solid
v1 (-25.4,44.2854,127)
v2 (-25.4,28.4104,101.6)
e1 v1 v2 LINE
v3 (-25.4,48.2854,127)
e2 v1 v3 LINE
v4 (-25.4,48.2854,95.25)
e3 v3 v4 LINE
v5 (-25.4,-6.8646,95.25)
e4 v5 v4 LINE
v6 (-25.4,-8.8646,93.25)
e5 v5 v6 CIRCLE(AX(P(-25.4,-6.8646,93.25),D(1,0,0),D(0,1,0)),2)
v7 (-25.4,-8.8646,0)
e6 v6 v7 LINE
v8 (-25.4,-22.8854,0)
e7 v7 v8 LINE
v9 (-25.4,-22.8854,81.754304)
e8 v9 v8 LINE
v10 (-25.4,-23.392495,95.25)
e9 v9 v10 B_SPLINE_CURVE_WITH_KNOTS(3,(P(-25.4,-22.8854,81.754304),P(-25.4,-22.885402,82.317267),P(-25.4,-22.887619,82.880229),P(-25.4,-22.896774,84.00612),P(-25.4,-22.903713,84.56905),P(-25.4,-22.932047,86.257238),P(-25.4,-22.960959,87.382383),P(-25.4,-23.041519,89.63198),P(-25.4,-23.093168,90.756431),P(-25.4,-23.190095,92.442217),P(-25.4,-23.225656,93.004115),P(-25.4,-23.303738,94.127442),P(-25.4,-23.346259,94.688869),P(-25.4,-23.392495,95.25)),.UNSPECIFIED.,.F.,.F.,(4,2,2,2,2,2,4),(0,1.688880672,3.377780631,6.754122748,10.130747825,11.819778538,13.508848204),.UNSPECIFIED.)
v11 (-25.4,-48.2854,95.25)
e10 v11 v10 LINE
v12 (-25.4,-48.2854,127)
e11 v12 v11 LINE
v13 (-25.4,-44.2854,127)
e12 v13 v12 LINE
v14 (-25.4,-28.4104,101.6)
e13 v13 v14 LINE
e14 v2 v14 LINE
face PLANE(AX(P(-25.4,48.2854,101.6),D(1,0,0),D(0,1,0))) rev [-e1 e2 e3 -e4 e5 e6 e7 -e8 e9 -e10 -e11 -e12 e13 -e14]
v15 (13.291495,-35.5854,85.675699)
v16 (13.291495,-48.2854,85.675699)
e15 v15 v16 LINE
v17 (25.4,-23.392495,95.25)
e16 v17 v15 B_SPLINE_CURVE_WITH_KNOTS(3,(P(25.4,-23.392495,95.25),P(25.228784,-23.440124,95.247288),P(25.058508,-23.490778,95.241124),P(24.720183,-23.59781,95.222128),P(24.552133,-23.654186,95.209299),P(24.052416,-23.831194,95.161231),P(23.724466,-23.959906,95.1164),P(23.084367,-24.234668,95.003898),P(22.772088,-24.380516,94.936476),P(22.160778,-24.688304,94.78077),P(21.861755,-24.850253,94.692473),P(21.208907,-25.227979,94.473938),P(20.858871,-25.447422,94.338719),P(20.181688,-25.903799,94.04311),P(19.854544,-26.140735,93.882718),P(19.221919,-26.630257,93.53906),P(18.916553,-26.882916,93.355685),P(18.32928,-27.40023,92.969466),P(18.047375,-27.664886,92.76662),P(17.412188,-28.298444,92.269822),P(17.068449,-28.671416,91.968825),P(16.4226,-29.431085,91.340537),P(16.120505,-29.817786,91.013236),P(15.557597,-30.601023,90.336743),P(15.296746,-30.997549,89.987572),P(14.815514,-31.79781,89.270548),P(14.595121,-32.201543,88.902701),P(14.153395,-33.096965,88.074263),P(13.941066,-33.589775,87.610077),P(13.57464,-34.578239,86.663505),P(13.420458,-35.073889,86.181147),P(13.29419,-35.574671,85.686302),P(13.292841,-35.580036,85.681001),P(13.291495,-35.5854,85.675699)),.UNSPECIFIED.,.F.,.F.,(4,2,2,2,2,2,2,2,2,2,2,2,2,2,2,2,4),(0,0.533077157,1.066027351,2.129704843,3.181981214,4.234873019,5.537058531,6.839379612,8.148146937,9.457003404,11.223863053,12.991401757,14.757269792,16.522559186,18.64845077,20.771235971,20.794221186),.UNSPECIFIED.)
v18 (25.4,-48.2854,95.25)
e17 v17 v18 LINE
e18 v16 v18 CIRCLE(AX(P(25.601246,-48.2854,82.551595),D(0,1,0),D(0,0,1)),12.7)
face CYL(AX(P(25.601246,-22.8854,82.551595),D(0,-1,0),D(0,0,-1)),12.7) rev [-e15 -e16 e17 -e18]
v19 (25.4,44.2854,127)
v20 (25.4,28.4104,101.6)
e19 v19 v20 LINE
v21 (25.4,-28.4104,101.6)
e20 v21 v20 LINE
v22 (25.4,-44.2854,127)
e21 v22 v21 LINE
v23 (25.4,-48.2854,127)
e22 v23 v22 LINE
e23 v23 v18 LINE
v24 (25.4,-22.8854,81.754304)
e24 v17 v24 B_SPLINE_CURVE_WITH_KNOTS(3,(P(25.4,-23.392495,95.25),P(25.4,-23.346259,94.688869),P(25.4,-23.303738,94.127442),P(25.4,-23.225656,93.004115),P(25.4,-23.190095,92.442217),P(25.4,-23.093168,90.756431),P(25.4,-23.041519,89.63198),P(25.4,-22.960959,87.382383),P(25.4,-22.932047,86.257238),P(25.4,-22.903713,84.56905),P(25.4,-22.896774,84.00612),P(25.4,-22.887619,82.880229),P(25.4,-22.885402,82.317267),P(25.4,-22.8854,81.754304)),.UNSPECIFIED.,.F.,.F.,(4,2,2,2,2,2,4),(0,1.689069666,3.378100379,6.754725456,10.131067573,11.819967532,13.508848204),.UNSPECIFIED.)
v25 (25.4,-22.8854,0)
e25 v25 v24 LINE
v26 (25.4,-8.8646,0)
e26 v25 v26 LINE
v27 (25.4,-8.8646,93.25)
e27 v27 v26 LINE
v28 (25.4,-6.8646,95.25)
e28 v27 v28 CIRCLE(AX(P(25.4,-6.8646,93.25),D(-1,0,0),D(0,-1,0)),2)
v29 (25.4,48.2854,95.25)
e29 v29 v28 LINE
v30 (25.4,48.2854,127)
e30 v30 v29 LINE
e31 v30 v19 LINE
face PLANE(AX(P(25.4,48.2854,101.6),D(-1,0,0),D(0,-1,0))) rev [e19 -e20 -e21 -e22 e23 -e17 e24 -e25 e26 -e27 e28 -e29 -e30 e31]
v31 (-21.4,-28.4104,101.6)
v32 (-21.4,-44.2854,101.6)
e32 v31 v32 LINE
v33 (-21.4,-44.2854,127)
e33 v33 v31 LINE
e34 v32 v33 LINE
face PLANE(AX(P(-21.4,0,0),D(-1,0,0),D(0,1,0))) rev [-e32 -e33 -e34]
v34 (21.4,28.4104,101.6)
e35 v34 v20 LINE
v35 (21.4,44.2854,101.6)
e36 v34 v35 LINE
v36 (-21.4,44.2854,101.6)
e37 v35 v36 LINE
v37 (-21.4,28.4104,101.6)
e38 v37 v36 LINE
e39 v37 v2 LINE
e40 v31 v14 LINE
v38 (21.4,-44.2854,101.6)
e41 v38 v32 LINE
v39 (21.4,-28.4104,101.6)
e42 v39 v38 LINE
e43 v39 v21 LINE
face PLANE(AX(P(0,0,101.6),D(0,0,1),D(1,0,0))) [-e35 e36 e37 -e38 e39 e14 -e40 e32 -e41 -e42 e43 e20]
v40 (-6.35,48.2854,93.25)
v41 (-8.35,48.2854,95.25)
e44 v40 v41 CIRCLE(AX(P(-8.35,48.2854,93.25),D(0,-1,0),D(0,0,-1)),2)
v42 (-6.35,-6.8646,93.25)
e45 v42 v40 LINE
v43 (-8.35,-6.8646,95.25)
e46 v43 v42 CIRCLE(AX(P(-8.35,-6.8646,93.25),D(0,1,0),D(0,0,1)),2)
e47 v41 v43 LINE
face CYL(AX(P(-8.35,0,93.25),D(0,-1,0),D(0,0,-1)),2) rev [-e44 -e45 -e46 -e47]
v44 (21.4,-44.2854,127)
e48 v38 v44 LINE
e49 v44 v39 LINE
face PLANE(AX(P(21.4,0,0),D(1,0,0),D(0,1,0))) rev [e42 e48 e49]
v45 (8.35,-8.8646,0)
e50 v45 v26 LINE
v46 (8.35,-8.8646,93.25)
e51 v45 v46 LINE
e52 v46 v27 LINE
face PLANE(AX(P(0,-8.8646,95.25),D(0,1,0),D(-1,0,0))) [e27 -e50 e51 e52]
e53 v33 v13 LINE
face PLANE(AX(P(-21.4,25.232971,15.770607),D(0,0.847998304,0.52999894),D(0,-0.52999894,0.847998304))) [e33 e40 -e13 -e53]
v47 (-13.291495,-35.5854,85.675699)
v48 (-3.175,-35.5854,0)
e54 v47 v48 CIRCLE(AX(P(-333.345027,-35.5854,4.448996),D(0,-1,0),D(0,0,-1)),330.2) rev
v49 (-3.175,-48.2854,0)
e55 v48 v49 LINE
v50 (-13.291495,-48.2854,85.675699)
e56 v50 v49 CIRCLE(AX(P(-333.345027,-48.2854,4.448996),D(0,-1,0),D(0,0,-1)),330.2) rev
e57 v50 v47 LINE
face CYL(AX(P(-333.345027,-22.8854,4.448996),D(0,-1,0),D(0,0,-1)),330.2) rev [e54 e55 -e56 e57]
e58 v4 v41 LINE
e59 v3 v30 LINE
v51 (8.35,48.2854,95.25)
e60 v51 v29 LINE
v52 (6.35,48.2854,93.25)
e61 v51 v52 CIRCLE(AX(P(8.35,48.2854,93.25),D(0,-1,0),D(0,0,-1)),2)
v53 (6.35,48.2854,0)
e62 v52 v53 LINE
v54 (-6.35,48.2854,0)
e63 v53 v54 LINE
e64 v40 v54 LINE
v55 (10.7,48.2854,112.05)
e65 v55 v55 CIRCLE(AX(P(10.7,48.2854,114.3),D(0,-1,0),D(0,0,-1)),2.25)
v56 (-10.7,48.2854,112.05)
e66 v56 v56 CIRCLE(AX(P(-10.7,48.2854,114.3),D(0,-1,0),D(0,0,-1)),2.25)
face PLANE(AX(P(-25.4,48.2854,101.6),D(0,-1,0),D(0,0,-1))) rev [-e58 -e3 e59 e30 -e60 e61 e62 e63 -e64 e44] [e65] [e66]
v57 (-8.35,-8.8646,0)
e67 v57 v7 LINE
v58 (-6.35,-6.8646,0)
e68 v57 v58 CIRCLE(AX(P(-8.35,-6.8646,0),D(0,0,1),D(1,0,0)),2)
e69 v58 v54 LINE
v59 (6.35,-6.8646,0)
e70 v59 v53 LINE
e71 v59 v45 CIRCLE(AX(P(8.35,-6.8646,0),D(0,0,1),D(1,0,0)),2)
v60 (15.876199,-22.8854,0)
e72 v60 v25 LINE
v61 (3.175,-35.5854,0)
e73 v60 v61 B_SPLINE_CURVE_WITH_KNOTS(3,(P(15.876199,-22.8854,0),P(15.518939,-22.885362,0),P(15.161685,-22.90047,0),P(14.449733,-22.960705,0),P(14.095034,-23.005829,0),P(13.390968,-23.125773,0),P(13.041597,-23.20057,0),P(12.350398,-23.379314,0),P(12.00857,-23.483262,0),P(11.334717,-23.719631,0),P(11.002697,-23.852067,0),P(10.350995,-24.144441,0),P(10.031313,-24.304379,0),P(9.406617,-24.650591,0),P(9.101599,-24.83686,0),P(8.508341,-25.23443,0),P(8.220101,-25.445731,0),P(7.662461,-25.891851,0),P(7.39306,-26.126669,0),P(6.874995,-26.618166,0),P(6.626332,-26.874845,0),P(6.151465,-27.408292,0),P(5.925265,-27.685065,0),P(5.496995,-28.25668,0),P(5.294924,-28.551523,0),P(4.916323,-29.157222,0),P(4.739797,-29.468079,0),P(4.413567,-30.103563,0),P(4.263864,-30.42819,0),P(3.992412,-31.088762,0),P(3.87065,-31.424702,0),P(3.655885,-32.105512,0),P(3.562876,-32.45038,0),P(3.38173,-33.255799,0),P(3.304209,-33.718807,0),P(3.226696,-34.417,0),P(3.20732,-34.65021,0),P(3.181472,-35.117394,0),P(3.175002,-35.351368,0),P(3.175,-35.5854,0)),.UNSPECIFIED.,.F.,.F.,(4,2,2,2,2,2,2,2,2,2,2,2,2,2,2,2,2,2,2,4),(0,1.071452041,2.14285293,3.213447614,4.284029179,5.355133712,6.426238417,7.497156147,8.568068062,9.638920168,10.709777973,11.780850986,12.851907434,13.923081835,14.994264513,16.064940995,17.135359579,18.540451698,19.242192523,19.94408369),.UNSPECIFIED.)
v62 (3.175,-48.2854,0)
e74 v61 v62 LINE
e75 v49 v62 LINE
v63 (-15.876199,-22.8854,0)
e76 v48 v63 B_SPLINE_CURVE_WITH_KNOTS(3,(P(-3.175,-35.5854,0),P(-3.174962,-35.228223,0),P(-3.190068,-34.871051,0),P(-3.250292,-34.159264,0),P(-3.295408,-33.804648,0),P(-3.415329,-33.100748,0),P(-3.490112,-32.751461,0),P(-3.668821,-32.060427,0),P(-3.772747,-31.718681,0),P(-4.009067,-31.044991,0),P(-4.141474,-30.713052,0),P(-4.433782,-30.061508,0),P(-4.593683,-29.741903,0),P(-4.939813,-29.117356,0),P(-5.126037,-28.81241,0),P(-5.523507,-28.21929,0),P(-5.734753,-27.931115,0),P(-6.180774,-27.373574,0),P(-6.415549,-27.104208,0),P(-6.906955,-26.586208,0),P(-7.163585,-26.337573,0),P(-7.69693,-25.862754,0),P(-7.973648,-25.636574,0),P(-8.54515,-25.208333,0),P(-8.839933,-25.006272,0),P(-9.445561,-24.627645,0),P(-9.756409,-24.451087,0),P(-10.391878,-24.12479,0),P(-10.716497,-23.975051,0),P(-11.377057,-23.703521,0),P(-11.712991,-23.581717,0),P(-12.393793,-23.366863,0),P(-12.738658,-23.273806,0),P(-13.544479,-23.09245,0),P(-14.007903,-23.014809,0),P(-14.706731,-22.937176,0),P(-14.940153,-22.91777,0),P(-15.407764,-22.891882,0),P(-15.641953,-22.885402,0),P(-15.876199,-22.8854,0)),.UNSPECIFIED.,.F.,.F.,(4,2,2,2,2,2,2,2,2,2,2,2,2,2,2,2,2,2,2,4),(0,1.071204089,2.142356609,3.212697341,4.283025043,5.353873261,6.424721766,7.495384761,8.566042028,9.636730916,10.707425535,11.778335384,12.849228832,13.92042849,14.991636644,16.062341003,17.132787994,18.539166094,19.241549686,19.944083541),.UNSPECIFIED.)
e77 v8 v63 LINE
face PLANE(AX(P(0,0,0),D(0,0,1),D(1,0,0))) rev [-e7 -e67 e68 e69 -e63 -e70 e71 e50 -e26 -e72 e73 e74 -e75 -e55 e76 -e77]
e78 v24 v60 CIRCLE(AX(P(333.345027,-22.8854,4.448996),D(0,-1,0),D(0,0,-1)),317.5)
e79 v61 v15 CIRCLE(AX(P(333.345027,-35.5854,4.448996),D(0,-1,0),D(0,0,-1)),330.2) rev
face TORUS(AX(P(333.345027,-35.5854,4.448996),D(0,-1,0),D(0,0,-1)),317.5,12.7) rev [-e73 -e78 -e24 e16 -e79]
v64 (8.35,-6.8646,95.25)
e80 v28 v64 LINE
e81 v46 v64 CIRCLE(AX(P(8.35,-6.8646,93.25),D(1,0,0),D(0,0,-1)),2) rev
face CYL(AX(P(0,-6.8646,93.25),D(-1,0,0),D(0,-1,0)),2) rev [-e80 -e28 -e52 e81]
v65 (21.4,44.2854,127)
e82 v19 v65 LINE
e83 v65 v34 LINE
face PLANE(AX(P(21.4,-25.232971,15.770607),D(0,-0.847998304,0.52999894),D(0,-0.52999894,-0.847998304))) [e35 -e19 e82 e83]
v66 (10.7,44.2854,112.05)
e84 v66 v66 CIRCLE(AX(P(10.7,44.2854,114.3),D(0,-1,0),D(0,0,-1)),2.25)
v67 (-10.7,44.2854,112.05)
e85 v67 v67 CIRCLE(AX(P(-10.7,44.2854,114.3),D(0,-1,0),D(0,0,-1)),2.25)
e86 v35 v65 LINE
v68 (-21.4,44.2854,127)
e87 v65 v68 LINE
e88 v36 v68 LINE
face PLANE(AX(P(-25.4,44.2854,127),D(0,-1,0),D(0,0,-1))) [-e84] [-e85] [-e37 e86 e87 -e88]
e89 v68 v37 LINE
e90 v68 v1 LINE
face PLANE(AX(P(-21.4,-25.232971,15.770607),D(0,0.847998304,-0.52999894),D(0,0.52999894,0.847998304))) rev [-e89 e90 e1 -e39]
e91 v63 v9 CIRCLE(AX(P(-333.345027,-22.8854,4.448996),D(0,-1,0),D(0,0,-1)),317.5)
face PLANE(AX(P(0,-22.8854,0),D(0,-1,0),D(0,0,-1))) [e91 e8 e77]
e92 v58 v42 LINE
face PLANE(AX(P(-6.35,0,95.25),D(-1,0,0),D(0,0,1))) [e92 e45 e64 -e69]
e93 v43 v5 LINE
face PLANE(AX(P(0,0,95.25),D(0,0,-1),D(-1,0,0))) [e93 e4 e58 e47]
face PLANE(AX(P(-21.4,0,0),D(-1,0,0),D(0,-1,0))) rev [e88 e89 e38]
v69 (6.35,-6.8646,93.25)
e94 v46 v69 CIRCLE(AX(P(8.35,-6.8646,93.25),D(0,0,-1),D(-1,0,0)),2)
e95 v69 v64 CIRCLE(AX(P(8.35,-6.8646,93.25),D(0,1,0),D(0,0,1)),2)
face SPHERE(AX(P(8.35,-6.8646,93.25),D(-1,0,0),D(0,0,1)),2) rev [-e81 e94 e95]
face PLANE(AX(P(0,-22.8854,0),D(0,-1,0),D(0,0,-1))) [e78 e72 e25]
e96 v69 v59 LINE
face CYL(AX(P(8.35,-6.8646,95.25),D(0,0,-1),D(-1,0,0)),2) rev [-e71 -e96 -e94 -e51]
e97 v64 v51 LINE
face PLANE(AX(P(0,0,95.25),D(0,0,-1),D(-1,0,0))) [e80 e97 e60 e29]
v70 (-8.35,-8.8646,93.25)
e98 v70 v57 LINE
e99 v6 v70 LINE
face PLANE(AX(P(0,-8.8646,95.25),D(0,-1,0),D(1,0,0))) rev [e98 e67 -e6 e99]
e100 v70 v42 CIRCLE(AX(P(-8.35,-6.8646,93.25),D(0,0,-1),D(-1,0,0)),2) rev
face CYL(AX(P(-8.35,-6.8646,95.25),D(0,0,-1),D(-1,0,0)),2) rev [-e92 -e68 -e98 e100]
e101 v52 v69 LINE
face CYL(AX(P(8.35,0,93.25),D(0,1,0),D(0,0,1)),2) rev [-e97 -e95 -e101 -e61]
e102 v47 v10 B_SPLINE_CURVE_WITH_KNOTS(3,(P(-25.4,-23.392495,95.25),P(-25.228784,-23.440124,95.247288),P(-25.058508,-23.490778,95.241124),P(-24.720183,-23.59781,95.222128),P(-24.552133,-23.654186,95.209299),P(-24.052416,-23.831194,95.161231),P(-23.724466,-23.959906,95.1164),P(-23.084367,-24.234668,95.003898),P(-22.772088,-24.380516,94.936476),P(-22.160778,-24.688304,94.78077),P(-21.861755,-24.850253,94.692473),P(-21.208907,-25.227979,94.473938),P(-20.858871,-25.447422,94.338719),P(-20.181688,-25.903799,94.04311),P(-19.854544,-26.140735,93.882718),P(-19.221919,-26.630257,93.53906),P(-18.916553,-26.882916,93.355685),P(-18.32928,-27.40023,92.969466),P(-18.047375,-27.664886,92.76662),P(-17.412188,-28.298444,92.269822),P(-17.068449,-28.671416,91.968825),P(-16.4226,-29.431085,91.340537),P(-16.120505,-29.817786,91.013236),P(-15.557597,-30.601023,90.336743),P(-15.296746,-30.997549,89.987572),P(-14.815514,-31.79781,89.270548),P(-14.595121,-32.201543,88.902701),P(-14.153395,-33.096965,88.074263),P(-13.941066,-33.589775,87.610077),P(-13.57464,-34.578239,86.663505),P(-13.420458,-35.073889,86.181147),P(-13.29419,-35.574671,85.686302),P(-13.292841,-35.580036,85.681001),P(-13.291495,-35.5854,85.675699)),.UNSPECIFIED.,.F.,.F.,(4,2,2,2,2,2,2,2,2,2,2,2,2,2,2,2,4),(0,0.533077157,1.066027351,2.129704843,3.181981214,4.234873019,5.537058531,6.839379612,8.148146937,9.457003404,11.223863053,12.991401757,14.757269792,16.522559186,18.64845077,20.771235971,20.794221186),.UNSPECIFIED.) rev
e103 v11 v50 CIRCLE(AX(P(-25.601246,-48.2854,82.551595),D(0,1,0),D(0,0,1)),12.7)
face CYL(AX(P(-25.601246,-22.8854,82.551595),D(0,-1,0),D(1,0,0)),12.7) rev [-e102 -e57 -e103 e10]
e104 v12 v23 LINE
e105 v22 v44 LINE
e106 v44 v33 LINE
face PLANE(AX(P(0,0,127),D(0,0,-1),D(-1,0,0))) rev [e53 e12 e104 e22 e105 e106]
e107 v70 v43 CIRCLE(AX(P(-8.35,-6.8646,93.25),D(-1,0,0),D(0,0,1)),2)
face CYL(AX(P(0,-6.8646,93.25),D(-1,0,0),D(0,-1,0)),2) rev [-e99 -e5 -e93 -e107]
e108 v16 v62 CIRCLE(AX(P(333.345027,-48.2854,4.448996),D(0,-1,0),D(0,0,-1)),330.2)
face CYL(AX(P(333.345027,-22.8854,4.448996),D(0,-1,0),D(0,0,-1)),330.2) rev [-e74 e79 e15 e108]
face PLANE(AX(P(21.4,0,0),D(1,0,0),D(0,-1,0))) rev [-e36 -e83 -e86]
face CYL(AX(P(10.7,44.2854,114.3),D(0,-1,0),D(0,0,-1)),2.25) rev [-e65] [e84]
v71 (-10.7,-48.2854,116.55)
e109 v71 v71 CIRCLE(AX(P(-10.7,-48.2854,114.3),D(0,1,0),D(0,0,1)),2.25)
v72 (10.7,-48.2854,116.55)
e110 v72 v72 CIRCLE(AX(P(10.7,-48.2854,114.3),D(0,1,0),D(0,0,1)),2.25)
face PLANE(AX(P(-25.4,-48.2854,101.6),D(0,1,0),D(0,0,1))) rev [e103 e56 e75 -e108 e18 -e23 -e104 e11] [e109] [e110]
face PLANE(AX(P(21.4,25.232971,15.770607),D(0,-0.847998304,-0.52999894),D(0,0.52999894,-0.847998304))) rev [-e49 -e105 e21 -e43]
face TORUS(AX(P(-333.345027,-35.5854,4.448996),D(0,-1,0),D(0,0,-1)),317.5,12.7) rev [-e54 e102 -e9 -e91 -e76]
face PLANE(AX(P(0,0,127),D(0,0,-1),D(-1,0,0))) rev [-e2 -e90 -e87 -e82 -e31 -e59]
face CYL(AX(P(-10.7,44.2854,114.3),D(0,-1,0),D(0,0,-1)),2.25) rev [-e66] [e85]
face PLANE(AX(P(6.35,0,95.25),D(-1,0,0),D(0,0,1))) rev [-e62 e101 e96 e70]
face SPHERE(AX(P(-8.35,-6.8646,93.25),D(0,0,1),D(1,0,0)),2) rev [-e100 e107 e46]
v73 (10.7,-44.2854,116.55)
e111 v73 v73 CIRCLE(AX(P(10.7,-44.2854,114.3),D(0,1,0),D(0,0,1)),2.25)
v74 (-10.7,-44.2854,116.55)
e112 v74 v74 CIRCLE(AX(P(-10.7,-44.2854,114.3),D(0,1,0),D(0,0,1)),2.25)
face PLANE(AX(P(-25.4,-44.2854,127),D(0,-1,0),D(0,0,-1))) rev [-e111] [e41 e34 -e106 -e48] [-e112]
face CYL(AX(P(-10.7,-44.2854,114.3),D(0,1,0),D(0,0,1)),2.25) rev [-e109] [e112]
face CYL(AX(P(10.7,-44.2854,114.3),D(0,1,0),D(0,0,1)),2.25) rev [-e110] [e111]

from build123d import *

# Parameters (mm, degrees)
SKETCH1_W               = 50.8
SKETCH1_H               = 96.5708
BOSS_EXTRUDE1_DEPTH     = 101.6
CUT_EXTRUDE1_DEPTH      = 143.455745453
CUT_EXTRUDE1_DEPTH_BACK = 25.4
FILLET1_R               = 12.7
FILLET2_R               = 12.7
SKETCH4_W               = 50.8
SKETCH4_H               = 4
BOSS_EXTRUDE2_DEPTH     = 25.4
BOSS_EXTRUDE3_DEPTH     = 4
M4_CLEARANCE_HOLE1_D    = 4.5
MIRROR2_COPY_1_DEPTH    = 4
SKETCH10_W              = 19.05
SKETCH10_H              = 57.15
CUT_EXTRUDE2_DEPTH      = 95.25
FILLET3_R               = 2


with BuildPart() as part:
    # Sketch1 → Boss-Extrude1 (new body)
    with BuildSketch(Plane.XY):
        Rectangle(SKETCH1_W, SKETCH1_H)
    extrude(amount=BOSS_EXTRUDE1_DEPTH)

    # Sketch2 → Cut-Extrude1 (cut, two sides: drawn at the far end of the back side and taken through both)
    with BuildSketch(Plane.XZ.offset(48.2854).offset(-CUT_EXTRUDE1_DEPTH_BACK)):
        with BuildLine():
            Line((-25.4, 0), (-3.175, 0))
            ThreePointArc((-3.175, 0), (-6.041573742, 48.089456834), (-15.875, 95.25))
            Line((-15.875, 95.25), (-25.4, 95.25))
            Line((-25.4, 95.25), (-25.4, 0))
        make_face()
        with BuildLine():
            ThreePointArc((15.875, 95.25), (6.041573742, 48.089456834), (3.175, 0))
            Line((3.175, 0), (25.4, 0))
            Line((25.4, 0), (25.4, 95.25))
            Line((25.4, 95.25), (15.875, 95.25))
        make_face()
    extrude(amount=CUT_EXTRUDE1_DEPTH + CUT_EXTRUDE1_DEPTH_BACK, mode=Mode.SUBTRACT)

    # Fillet1
    fillet1_edges = [part.edges().sort_by_distance(p)[0] for p in [
        (6.041573742, -22.8854, 48.089456834),
        (-6.041573742, -22.8854, 48.089456834),
    ]]
    fillet(fillet1_edges, radius=FILLET1_R)

    # Fillet2
    # the kernel refuses this fillet: 12.7 mm, written as the material it adds along each edge
    with BuildSketch(Plane(origin=(-15.875, -48.2854, 95.25), x_dir=(-1, 0, 0), z_dir=(0, 1, 0))) as fillet2_piece_1:
        with BuildLine():
            CenterArc((9.726246489, -12.698405406), FILLET2_R, 90.90795725, 74.851551617)
            Line((-2.583504713, -9.57430148), (-2.829699737, -9.511819402))
            ThreePointArc((-2.829699737, -9.511819402), (-1.57292596, -4.711279583), (-0.244207713, 0.069846926))
            Line((-0.244207713, 0.069846926), (0, 0.254))
            ThreePointArc((0, 0.254), (4.7625, 0.254), (9.52097507, 0.253968108))
            Line((9.52097507, 0.253968108), (9.525, 0))
        make_face()
    extrude(amount=37.491851666)
    with BuildSketch(Plane(origin=(15.875, -48.2854, 95.25), x_dir=(1, 0, 0), z_dir=(0, 1, 0))) as fillet2_piece_2:
        with BuildLine():
            CenterArc((9.726246489, 12.698405406), FILLET2_R, 194.240491133, 74.851551617)
            Line((-2.583504713, 9.57430148), (-2.829699737, 9.511819402))
            ThreePointArc((-2.829699737, 9.511819402), (-1.57292596, 4.711279583), (-0.244207713, -0.069846926))
            Line((-0.244207713, -0.069846926), (0, -0.254))
            ThreePointArc((0, -0.254), (4.7625, -0.254), (9.52097507, -0.253968108))
            Line((9.52097507, -0.253968108), (9.525, 0))
        make_face()
    extrude(amount=37.491851666)

    # Sketch4 → Boss-Extrude2 (add)
    with BuildSketch(Plane.XY.offset(101.6)):
        with Locations((0, -46.2854)):
            Rectangle(SKETCH4_W, SKETCH4_H)
    boss_extrude2 = extrude(amount=BOSS_EXTRUDE2_DEPTH)

    # Sketch5 → Boss-Extrude3 (add)
    with BuildSketch(Plane(origin=(25.4, 0, 0), x_dir=(0, 0, -1), z_dir=(1, 0, 0))):
        Polygon((-101.6, -28.4104), (-127, -44.2854), (-101.6, -44.2854), align=None)
    boss_extrude3 = extrude(amount=-BOSS_EXTRUDE3_DEPTH)

    # Mirror1: Boss-Extrude3 across plane
    add(boss_extrude3.mirror(Plane(origin=(0, 0, 0), x_dir=(0, 0, 1), z_dir=(1, 0, 0))))

    # M4 Clearance Hole1 (through all)
    with Locations(Plane(origin=(0, -44.2854, 0), x_dir=(1, 0, 0), z_dir=(0, 1, 0))):
        with Locations((-10.7, -114.3), (10.7, -114.3)):
            m4_clearance_hole1 = Hole(M4_CLEARANCE_HOLE1_D / 2)

    # Mirror2: Boss-Extrude2, Boss-Extrude3, M4 Clearance Hole1 across plane
    add(boss_extrude2.mirror(Plane.ZX))
    add(boss_extrude3.mirror(Plane.ZX))
    add(m4_clearance_hole1.mirror(Plane.ZX), mode=Mode.SUBTRACT)

    # Mirror2 copy 1 sketch → Mirror2 copy 1 (add)
    with BuildSketch(Plane(origin=(-25.4, 0, 0), x_dir=(0, 0, -1), z_dir=(-1, 0, 0))):
        Polygon((-101.6, -28.4104), (-127, -44.2854), (-101.6, -44.2854), align=None)
    extrude(amount=-MIRROR2_COPY_1_DEPTH)

    # Sketch10 → Cut-Extrude2 (cut)
    with BuildSketch(Plane(origin=(0, 0, 0), x_dir=(-1, 0, 0), z_dir=(0, 0, -1))):
        with Locations((-15.875, 19.7104)):
            Rectangle(SKETCH10_W, SKETCH10_H)
        with Locations((15.875, 19.7104)):
            Rectangle(SKETCH10_W, SKETCH10_H)
    extrude(amount=-CUT_EXTRUDE2_DEPTH, mode=Mode.SUBTRACT)

    # Fillet3
    fillet3_edges = [part.edges().sort_by_distance(p)[0] for p in [
        (6.35, -8.8646, 47.625),
        (6.35, 19.7104, 95.25),
        (15.875, -8.8646, 95.25),
        (-6.35, -8.8646, 47.625),
        (-15.875, -8.8646, 95.25),
        (-6.35, 19.7104, 95.25),
    ]]
    fillet(fillet3_edges, radius=FILLET3_R)


solid = part.part
